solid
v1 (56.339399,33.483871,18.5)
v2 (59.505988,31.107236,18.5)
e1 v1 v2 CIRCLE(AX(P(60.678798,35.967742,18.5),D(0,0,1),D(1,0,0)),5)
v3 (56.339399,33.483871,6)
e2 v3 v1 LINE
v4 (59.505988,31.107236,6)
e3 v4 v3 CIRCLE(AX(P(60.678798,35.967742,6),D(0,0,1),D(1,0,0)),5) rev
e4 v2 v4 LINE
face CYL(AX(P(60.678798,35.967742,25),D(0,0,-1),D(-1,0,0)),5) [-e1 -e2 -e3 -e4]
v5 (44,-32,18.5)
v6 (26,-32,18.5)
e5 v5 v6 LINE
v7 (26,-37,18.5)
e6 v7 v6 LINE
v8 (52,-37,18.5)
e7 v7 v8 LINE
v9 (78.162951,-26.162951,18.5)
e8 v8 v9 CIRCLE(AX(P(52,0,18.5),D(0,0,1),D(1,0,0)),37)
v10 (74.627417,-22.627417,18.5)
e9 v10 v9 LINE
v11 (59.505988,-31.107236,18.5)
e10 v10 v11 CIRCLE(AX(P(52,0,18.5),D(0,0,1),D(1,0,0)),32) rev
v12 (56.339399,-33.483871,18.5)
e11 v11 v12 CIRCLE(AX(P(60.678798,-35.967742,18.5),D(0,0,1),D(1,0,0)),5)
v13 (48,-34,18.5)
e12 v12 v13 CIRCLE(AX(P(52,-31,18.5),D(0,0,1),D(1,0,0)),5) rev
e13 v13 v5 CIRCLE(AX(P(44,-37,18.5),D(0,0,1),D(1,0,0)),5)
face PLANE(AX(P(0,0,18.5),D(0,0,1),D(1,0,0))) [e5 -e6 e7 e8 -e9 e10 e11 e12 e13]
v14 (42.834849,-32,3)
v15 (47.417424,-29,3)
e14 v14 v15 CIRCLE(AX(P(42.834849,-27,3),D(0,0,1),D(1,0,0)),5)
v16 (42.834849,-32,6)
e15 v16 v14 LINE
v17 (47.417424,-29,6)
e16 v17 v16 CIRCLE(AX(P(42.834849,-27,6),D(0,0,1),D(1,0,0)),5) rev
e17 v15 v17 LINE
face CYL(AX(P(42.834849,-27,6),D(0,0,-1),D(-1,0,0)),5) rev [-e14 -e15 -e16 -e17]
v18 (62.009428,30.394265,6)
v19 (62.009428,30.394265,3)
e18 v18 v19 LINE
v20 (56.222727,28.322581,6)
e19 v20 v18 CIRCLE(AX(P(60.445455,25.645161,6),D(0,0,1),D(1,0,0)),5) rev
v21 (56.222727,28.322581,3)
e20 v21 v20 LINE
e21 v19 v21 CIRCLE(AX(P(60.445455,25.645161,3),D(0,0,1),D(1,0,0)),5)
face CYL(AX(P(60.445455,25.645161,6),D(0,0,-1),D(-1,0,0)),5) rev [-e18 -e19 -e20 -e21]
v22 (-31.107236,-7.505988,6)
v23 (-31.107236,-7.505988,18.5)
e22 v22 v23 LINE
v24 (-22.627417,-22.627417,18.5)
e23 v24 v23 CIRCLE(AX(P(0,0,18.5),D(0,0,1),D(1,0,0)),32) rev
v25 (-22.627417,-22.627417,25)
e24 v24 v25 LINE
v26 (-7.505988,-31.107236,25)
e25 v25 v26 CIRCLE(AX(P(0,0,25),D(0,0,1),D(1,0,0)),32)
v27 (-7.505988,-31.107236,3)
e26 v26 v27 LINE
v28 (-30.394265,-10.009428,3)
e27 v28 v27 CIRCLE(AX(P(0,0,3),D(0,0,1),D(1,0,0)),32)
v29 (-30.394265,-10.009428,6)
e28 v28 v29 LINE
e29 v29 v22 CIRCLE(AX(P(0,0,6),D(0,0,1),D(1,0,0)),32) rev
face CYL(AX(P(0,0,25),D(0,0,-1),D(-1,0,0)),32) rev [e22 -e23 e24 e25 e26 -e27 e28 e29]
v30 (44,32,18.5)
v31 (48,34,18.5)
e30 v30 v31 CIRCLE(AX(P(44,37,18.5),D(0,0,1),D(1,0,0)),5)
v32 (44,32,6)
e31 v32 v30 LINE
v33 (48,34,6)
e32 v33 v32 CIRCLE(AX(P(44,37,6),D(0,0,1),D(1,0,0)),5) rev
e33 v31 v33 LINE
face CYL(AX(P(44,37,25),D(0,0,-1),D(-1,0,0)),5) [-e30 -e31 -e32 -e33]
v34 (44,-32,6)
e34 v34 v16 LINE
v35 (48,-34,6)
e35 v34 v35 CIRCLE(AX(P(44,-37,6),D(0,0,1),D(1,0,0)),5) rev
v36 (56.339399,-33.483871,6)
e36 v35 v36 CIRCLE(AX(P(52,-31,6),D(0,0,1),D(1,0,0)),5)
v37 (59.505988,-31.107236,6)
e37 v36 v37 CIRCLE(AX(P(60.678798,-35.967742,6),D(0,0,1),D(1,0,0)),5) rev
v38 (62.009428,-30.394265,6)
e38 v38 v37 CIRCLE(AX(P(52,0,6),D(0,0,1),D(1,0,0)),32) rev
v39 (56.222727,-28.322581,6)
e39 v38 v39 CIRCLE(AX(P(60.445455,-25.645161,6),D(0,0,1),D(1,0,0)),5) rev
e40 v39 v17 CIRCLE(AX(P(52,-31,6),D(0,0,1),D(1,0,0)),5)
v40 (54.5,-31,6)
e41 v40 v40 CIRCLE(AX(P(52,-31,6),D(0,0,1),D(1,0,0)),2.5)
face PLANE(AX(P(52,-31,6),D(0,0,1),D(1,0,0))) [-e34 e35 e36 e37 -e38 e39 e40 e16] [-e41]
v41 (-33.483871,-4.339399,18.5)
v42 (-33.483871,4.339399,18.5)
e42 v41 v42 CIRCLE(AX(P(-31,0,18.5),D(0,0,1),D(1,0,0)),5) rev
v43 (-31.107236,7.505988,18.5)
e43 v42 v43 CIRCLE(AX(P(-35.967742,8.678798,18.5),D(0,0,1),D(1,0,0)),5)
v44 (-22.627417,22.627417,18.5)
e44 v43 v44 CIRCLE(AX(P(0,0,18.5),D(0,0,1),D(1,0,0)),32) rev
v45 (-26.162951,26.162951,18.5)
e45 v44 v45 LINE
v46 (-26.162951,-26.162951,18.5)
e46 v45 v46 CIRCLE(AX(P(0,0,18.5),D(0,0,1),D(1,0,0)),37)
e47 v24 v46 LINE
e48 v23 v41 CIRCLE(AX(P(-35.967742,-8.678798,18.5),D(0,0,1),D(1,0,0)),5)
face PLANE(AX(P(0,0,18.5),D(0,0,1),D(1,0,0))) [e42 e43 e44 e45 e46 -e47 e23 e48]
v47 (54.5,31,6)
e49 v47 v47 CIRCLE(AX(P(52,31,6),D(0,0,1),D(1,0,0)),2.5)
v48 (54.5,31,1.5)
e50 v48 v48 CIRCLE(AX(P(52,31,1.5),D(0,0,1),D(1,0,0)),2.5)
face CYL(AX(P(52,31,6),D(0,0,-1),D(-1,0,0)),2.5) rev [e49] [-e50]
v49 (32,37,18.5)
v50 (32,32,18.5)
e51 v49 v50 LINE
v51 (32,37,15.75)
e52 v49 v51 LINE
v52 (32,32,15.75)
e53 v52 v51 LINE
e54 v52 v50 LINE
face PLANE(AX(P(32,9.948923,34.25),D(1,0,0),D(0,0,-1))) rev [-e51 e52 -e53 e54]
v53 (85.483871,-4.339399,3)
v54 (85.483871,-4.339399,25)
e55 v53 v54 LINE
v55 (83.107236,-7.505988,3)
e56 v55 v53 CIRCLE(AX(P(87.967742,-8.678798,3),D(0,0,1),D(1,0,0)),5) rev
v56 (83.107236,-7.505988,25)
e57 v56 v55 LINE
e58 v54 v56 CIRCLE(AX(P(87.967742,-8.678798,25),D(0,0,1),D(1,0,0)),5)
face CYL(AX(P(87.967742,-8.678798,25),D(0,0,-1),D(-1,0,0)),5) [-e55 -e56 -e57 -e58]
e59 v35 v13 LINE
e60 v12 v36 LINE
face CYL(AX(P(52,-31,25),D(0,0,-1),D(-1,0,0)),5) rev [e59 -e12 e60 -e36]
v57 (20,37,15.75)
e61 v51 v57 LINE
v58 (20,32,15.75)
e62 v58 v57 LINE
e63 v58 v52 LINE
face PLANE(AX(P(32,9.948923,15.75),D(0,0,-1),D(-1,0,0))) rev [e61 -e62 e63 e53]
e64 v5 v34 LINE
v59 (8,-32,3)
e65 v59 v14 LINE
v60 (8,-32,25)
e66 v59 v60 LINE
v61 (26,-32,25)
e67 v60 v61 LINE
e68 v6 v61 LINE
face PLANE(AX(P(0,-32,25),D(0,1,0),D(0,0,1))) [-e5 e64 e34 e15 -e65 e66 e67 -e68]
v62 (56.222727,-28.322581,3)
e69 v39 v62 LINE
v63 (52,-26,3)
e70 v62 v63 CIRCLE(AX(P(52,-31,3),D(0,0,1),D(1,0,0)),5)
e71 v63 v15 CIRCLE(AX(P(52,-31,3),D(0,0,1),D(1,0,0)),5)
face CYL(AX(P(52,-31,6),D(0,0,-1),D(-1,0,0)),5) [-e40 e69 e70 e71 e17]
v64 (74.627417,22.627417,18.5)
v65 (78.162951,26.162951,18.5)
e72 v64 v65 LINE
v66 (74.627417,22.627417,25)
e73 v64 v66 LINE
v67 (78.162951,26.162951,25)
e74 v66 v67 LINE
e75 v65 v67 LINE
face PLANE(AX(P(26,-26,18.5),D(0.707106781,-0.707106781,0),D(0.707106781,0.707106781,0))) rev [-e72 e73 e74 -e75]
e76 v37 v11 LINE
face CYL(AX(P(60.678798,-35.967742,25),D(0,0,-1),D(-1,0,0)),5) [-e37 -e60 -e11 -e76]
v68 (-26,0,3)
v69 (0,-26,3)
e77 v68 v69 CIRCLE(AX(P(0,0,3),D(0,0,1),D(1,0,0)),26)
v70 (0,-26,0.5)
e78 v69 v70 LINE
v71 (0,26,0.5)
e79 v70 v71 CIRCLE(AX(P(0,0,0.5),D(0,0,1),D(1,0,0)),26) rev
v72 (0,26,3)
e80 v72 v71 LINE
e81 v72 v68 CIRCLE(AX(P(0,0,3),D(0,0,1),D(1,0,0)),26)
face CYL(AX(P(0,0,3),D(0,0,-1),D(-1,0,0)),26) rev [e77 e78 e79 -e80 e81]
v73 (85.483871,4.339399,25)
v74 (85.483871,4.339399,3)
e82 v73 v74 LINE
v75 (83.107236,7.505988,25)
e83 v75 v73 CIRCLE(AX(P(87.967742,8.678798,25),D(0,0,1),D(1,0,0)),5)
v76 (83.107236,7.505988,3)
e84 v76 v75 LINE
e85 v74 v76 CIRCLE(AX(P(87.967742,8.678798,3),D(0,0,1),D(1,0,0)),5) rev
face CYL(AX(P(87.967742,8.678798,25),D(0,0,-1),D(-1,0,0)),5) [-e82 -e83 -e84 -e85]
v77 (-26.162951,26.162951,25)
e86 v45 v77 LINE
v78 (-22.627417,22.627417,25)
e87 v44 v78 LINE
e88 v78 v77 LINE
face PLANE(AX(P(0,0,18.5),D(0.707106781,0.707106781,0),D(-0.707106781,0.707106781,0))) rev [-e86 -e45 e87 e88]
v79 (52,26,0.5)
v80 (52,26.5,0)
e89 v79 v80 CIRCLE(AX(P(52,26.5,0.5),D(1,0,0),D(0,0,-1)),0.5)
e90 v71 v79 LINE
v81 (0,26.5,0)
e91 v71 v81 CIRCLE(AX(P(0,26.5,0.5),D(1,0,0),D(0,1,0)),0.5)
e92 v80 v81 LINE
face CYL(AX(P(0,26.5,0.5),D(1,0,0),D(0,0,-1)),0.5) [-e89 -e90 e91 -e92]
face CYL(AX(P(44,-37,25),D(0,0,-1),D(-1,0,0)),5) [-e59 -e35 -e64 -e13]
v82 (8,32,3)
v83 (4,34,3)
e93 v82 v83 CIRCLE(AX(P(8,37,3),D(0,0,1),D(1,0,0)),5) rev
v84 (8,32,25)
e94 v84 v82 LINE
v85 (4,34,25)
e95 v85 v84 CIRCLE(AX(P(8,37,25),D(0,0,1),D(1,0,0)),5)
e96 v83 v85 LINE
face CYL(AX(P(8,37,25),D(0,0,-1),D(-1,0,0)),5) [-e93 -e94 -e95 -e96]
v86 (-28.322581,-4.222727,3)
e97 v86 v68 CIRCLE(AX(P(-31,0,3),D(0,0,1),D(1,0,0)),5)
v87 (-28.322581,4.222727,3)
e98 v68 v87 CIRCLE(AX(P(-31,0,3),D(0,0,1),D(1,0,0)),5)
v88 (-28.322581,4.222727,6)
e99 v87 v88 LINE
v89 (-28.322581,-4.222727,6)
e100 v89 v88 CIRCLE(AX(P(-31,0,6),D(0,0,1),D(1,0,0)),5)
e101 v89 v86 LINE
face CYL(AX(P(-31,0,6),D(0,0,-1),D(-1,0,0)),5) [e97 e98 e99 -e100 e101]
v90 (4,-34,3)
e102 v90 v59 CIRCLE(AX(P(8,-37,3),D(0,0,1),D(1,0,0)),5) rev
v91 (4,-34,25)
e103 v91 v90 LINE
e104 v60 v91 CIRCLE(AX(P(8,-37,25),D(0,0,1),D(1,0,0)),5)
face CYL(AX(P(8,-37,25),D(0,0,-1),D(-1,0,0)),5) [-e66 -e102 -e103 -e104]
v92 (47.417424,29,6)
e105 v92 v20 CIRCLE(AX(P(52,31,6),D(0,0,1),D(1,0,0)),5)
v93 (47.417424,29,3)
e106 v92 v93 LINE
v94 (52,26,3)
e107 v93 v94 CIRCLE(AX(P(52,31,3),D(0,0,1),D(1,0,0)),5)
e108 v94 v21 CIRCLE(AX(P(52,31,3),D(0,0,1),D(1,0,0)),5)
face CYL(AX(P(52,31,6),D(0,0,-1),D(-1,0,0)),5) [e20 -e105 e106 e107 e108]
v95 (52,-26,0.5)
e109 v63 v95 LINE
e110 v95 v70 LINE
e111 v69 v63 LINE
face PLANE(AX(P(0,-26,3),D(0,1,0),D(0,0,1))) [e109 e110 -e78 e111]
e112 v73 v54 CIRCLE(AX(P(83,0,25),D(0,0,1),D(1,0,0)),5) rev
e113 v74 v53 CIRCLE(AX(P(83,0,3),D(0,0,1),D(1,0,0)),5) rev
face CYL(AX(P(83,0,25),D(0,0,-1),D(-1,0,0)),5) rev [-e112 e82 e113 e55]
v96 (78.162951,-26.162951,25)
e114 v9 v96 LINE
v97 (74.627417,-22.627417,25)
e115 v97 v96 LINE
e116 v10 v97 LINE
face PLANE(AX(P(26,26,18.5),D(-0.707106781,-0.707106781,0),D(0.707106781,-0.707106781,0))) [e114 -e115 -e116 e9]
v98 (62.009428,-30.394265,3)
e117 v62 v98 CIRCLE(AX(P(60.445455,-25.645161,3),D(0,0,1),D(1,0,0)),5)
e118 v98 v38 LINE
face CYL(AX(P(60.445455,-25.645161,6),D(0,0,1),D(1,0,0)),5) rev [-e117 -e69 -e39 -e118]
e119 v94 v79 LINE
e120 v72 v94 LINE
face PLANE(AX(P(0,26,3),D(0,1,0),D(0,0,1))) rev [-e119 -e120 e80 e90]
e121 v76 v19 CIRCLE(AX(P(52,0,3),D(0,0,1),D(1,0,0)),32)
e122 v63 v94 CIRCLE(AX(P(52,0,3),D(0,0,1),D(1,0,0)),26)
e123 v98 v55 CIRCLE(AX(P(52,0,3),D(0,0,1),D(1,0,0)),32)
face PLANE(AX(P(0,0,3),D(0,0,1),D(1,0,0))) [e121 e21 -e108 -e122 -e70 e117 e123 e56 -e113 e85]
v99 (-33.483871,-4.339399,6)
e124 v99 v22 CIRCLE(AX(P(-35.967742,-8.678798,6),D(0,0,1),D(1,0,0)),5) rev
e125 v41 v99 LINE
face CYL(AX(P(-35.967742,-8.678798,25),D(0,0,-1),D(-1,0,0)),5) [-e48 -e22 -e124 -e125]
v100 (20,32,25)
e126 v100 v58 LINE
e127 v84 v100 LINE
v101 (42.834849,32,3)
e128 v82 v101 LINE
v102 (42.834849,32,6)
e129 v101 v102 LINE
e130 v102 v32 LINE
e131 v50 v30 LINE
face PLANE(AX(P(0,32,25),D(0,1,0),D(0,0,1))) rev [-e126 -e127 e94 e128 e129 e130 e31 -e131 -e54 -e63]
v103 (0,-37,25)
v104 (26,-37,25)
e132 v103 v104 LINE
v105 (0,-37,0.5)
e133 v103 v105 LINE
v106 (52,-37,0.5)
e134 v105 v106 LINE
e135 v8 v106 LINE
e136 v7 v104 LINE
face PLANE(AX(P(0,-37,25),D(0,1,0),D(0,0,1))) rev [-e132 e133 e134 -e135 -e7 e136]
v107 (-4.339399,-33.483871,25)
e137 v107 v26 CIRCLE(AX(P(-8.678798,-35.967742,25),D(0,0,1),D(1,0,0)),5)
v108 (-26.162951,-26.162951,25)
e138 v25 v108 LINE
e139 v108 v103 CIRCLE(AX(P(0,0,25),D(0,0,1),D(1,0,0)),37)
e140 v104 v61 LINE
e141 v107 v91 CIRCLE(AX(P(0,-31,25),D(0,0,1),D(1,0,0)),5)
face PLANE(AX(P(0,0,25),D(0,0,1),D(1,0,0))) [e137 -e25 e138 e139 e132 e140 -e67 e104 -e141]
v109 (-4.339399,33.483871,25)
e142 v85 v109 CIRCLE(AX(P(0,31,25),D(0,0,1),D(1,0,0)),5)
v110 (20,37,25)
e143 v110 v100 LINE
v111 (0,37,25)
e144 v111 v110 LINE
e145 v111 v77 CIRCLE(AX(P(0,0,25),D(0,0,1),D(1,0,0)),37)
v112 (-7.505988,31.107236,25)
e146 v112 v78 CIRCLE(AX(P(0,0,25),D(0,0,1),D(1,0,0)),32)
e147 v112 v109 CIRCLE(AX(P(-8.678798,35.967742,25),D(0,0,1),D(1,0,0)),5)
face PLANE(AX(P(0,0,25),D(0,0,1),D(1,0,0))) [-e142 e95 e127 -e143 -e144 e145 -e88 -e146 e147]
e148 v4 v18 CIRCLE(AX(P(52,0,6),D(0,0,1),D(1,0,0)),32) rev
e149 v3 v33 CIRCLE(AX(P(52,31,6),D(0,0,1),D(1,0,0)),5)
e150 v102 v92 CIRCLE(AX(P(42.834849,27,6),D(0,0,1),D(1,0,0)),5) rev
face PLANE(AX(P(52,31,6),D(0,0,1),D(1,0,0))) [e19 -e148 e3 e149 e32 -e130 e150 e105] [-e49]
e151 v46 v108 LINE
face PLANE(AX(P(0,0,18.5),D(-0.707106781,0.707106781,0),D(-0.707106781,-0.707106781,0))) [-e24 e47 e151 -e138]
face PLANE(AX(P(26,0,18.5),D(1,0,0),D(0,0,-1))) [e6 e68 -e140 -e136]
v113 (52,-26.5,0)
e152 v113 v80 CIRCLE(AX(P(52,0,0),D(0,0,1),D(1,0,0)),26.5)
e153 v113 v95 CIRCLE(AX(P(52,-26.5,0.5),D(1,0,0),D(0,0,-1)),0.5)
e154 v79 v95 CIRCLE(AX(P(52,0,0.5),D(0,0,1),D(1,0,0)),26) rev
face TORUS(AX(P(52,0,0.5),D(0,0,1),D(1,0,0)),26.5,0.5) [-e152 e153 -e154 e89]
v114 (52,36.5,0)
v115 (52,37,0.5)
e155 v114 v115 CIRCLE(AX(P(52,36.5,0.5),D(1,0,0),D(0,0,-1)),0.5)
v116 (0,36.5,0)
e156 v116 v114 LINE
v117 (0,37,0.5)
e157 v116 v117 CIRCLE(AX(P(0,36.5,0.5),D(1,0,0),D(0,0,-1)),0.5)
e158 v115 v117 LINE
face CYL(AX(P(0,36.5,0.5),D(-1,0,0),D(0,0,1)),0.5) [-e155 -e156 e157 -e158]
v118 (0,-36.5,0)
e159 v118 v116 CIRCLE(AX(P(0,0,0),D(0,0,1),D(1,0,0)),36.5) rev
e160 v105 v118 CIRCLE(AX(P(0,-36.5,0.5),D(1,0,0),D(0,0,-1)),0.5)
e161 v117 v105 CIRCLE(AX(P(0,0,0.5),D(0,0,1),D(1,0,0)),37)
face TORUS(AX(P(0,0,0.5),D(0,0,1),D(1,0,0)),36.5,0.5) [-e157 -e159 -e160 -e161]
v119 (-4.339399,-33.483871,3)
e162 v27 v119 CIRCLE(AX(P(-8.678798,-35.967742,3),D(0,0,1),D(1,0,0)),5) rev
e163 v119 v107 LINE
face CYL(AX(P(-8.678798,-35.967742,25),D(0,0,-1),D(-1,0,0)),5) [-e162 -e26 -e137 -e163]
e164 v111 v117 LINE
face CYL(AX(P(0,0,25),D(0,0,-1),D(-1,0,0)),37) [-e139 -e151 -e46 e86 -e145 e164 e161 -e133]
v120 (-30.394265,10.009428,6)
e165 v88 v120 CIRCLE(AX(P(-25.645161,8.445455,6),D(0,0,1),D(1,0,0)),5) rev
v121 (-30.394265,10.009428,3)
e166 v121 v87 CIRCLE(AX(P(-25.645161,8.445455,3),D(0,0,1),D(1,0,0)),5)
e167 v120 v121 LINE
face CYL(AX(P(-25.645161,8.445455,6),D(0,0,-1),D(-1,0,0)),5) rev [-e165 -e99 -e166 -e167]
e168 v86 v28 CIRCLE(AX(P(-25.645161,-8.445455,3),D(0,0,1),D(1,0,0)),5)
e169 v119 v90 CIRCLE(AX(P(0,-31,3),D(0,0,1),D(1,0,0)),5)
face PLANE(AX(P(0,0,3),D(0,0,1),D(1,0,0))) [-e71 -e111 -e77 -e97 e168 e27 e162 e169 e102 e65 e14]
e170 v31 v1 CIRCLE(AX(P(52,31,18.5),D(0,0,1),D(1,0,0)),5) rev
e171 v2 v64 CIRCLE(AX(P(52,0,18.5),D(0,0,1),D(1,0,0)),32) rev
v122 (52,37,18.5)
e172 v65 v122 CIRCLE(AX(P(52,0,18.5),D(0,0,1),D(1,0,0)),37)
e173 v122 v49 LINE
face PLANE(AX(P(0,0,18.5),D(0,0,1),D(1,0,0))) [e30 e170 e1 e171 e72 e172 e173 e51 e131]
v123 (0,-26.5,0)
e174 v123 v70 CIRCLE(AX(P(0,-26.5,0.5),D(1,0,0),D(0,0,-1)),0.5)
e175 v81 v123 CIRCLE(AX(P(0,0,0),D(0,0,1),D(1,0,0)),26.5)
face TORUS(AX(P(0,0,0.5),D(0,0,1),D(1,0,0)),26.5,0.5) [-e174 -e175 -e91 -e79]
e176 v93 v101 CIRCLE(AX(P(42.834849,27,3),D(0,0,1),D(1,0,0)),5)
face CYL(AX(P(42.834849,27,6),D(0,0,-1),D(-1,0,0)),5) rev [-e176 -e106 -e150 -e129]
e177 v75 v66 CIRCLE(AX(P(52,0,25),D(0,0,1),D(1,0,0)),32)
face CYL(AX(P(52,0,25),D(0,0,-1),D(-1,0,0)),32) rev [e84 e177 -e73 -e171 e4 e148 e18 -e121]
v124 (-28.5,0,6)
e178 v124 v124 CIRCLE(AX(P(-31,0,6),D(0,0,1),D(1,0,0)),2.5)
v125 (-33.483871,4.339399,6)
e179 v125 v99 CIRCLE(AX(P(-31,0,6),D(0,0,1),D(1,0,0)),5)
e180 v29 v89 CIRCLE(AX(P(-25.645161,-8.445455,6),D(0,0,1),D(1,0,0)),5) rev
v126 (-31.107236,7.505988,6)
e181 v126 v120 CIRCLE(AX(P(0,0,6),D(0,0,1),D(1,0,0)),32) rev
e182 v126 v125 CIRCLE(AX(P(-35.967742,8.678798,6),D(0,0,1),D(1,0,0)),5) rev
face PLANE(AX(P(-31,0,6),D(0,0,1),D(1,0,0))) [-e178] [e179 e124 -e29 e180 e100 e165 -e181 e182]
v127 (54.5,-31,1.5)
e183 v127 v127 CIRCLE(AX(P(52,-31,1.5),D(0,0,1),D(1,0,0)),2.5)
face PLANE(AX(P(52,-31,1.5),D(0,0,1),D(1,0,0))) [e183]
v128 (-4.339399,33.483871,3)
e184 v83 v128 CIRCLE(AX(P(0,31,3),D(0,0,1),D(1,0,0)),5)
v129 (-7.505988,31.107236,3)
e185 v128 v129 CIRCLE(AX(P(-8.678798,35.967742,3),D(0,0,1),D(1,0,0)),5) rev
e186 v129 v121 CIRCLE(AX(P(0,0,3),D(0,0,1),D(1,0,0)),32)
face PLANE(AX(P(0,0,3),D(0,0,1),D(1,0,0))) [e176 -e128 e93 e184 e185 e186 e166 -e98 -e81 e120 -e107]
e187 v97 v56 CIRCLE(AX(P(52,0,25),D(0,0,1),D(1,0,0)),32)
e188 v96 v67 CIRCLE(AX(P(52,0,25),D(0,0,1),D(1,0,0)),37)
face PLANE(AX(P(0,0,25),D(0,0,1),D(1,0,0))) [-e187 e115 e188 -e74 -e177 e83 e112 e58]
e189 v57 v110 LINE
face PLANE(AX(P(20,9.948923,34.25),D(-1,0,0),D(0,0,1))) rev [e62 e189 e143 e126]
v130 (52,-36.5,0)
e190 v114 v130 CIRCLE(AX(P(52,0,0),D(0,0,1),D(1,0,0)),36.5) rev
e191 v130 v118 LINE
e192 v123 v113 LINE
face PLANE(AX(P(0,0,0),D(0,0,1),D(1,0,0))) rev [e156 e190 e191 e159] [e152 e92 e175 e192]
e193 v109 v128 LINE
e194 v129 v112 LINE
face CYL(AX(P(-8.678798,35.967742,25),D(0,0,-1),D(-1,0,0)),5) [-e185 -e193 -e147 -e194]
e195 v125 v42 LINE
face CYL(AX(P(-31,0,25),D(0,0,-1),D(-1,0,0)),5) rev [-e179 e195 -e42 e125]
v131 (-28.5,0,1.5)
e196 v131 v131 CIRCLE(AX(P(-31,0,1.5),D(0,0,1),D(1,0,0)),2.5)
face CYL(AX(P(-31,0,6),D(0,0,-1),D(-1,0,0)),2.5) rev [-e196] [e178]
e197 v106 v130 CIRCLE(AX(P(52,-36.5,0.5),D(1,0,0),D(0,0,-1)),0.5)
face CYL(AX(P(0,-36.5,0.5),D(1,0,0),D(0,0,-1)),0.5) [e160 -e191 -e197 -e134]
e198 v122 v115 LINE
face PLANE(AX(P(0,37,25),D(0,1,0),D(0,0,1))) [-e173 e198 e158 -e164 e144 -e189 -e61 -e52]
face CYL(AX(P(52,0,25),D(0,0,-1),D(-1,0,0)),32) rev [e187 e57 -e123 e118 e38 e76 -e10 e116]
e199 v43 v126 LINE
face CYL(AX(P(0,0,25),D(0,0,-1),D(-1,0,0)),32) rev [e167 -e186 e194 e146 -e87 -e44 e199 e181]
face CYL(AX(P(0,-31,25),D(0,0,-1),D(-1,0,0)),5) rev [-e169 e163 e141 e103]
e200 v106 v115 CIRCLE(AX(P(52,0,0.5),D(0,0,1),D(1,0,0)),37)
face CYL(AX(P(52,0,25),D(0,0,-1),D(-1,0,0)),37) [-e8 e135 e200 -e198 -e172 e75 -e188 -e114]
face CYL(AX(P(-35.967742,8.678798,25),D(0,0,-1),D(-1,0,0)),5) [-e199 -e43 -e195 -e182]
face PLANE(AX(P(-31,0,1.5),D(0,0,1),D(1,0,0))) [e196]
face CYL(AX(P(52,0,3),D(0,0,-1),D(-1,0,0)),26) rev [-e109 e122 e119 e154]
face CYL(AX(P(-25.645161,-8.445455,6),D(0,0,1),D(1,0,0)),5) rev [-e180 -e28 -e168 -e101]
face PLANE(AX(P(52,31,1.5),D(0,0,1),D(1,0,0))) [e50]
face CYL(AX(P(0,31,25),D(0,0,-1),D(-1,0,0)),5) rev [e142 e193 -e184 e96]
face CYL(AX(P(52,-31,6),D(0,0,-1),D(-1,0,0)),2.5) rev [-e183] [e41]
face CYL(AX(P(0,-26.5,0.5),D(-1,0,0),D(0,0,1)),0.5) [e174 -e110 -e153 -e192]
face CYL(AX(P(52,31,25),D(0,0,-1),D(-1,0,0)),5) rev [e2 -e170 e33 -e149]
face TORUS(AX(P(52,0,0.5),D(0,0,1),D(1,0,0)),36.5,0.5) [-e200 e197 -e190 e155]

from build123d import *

# Parameters (mm, degrees)
BOSS_EXTRUDE1_DEPTH = 25
SKETCH1_3_R         = 5
BOSS_EXTRUDE2_DEPTH = 3
SKETCH2_W           = 12
SKETCH2_H           = 18.5
CUT_EXTRUDE1_DEPTH  = 5
BOSS_EXTRUDE3_START = 3
SKETCH1_4_R         = 5
SKETCH1_4_R_2       = 2.5
BOSS_EXTRUDE3_DEPTH = 3
FILLET2_R           = 5
FILLET3_R           = 5
FILLET1_R           = 0.5
CUT_EXTRUDE3_START  = 1.5
SKETCH1_6_R         = 2.5
CUT_EXTRUDE3_DEPTH  = 1.5
CUT_EXTRUDE4_START  = -6.5
CUT_EXTRUDE4_DEPTH  = 6.5


with BuildPart() as part:
    # Sketch1 → Boss-Extrude1 (new body)
    with BuildSketch(Plane.XY):
        with BuildLine():
            Line((52, 37), (0, 37))
            ThreePointArc((0, 37), (-37, 0), (0, -37))
            Line((0, -37), (52, -37))
            ThreePointArc((52, -37), (89, 0), (52, 37))
        make_face()
        with BuildLine():
            ThreePointArc((-31.612903226, 4.96229278), (-22.627416998, 22.627416998), (-4.96229278, 31.612903226))
            ThreePointArc((-4.96229278, 31.612903226), (-0.196120171, 35.996152207), (4.898979486, 32))
            Line((4.898979486, 32), (47.101020514, 32))
            ThreePointArc((47.101020514, 32), (52.196120171, 35.996152207), (56.96229278, 31.612903226))
            ThreePointArc((56.96229278, 31.612903226), (74.627416998, 22.627416998), (83.612903226, 4.96229278))
            ThreePointArc((83.612903226, 4.96229278), (86.745965572, 3.311758134), (88, 0))
            ThreePointArc((88, 0), (86.745965572, -3.311758134), (83.612903226, -4.96229278))
            ThreePointArc((83.612903226, -4.96229278), (74.627416998, -22.627416998), (56.96229278, -31.612903226))
            ThreePointArc((56.96229278, -31.612903226), (52.196120171, -35.996152207), (47.101020514, -32))
            Line((47.101020514, -32), (4.898979486, -32))
            ThreePointArc((4.898979486, -32), (-0.196120171, -35.996152207), (-4.96229278, -31.612903226))
            ThreePointArc((-4.96229278, -31.612903226), (-22.627416998, -22.627416998), (-31.612903226, -4.96229278))
            ThreePointArc((-31.612903226, -4.96229278), (-36, 0), (-31.612903226, 4.96229278))
        make_face(mode=Mode.SUBTRACT)
    extrude(amount=BOSS_EXTRUDE1_DEPTH)

    # Sketch1<3> → Boss-Extrude2 (add)
    # profile 1 of 43: a face of its own
    with BuildSketch(Plane.XY):
        with BuildLine():
            Line((0, -37), (52, -37))
            ThreePointArc((52, -37), (89, 0), (52, 37))
            Line((52, 37), (0, 37))
            ThreePointArc((0, 37), (-37, 0), (0, -37))
        make_face()
        with Locations((0, 31)):
            Circle(SKETCH1_3_R, mode=Mode.SUBTRACT)
        with Locations((52, 31)):
            Circle(SKETCH1_3_R, mode=Mode.SUBTRACT)
        with Locations((83, 0)):
            Circle(SKETCH1_3_R, mode=Mode.SUBTRACT)
        with Locations((52, -31)):
            Circle(SKETCH1_3_R, mode=Mode.SUBTRACT)
        with Locations((0, -31)):
            Circle(SKETCH1_3_R, mode=Mode.SUBTRACT)
        with Locations((-31, 0)):
            Circle(SKETCH1_3_R, mode=Mode.SUBTRACT)
        with BuildLine():
            Line((0, 32), (52, 32))
            ThreePointArc((52, 32), (84, 0), (52, -32))
            Line((52, -32), (0, -32))
            ThreePointArc((0, -32), (-32, 0), (0, 32))
        make_face(mode=Mode.SUBTRACT)
    # profile 2 of 43: a face of its own
    with BuildSketch(Plane.XY):
        with BuildLine():
            Line((52, 32), (49.708712153, 32))
            ThreePointArc((49.708712153, 32), (51.489225891, 28.552734218), (54.5, 31))
            ThreePointArc((54.5, 31), (54.456219207, 31.465818858), (54.326410233, 31.915322581))
            ThreePointArc((54.326410233, 31.915322581), (53.16397539, 31.978823638), (52, 32))
        make_face()
    # profile 3 of 43: a face of its own
    with BuildSketch(Plane.XY):
        with BuildLine():
            ThreePointArc((54.326410233, 31.915322581), (52.04583625, 33.499579772), (49.708712153, 32))
            Line((49.708712153, 32), (52, 32))
            ThreePointArc((52, 32), (53.16397539, 31.978823638), (54.326410233, 31.915322581))
        make_face()
    # profile 4 of 43: a face of its own
    with BuildSketch(Plane.XY):
        with BuildLine():
            ThreePointArc((56.96229278, 31.612903226), (52.196120171, 35.996152207), (47.101020514, 32))
            Line((47.101020514, 32), (49.708712153, 32))
            ThreePointArc((49.708712153, 32), (52.04583625, 33.499579772), (54.326410233, 31.915322581))
            ThreePointArc((54.326410233, 31.915322581), (55.647487117, 31.791442838), (56.96229278, 31.612903226))
        make_face()
    # profile 5 of 43: a face of its own
    with BuildSketch(Plane.XY):
        with BuildLine():
            ThreePointArc((47.101020514, 32), (48.127016654, 27.83772234), (52, 26))
            ThreePointArc((52, 26), (55.535533906, 27.464466094), (57, 31))
            ThreePointArc((57, 31), (56.990564292, 31.307031024), (56.96229278, 31.612903226))
            ThreePointArc((56.96229278, 31.612903226), (55.647487117, 31.791442838), (54.326410233, 31.915322581))
            ThreePointArc((54.326410233, 31.915322581), (54.456219207, 31.465818858), (54.5, 31))
            ThreePointArc((54.5, 31), (51.489225891, 28.552734218), (49.708712153, 32))
            Line((49.708712153, 32), (47.101020514, 32))
        make_face()
    # profile 6 of 43: a face of its own
    with BuildSketch(Plane.XY):
        with BuildLine():
            Line((52, 32), (49.708712153, 32))
            ThreePointArc((49.708712153, 32), (51.489225891, 28.552734218), (54.5, 31))
            ThreePointArc((54.5, 31), (54.456219207, 31.465818858), (54.326410233, 31.915322581))
            ThreePointArc((54.326410233, 31.915322581), (53.16397539, 31.978823638), (52, 32))
        make_face()
    # profile 7 of 43: a face of its own
    with BuildSketch(Plane.XY):
        with BuildLine():
            ThreePointArc((54.326410233, 31.915322581), (52.04583625, 33.499579772), (49.708712153, 32))
            Line((49.708712153, 32), (52, 32))
            ThreePointArc((52, 32), (53.16397539, 31.978823638), (54.326410233, 31.915322581))
        make_face()
    # profile 8 of 43: a face of its own
    with BuildSketch(Plane.XY):
        with BuildLine():
            ThreePointArc((56.96229278, 31.612903226), (52.196120171, 35.996152207), (47.101020514, 32))
            Line((47.101020514, 32), (49.708712153, 32))
            ThreePointArc((49.708712153, 32), (52.04583625, 33.499579772), (54.326410233, 31.915322581))
            ThreePointArc((54.326410233, 31.915322581), (55.647487117, 31.791442838), (56.96229278, 31.612903226))
        make_face()
    # profile 9 of 43: a face of its own
    with BuildSketch(Plane.XY):
        with BuildLine():
            ThreePointArc((47.101020514, 32), (48.127016654, 27.83772234), (52, 26))
            ThreePointArc((52, 26), (55.535533906, 27.464466094), (57, 31))
            ThreePointArc((57, 31), (56.990564292, 31.307031024), (56.96229278, 31.612903226))
            ThreePointArc((56.96229278, 31.612903226), (55.647487117, 31.791442838), (54.326410233, 31.915322581))
            ThreePointArc((54.326410233, 31.915322581), (54.456219207, 31.465818858), (54.5, 31))
            ThreePointArc((54.5, 31), (51.489225891, 28.552734218), (49.708712153, 32))
            Line((49.708712153, 32), (47.101020514, 32))
        make_face()
    # profile 10 of 43: a face of its own
    with BuildSketch(Plane.XY):
        with BuildLine():
            ThreePointArc((57, 31), (55.535533906, 27.464466094), (52, 26))
            ThreePointArc((52, 26), (70.384776311, 18.384776311), (78, 0))
            ThreePointArc((78, 0), (79.688241866, 3.745965572), (83.612903226, 4.96229278))
            ThreePointArc((83.612903226, 4.96229278), (74.627416998, 22.627416998), (56.96229278, 31.612903226))
            ThreePointArc((56.96229278, 31.612903226), (56.990564292, 31.307031024), (57, 31))
        make_face()
    # profile 11 of 43: a face of its own
    with BuildSketch(Plane.XY):
        with BuildLine():
            ThreePointArc((88, 0), (86.745965572, 3.311758134), (83.612903226, 4.96229278))
            ThreePointArc((83.612903226, 4.96229278), (84, 0), (83.612903226, -4.96229278))
            ThreePointArc((83.612903226, -4.96229278), (86.745965572, -3.311758134), (88, 0))
        make_face()
    # profile 12 of 43: a face of its own
    with BuildSketch(Plane.XY):
        with BuildLine():
            ThreePointArc((83.612903226, 4.96229278), (79.688241866, 3.745965572), (78, 0))
            ThreePointArc((78, 0), (79.688241866, -3.745965572), (83.612903226, -4.96229278))
            ThreePointArc((83.612903226, -4.96229278), (84, 0), (83.612903226, 4.96229278))
        make_face()
    # profile 13 of 43: a face of its own
    with BuildSketch(Plane.XY):
        with BuildLine():
            ThreePointArc((83.612903226, -4.96229278), (79.688241866, -3.745965572), (78, 0))
            ThreePointArc((78, 0), (70.384776311, -18.384776311), (52, -26))
            ThreePointArc((52, -26), (55.535533906, -27.464466094), (57, -31))
            ThreePointArc((57, -31), (56.990564292, -31.307031024), (56.96229278, -31.612903226))
            ThreePointArc((56.96229278, -31.612903226), (74.627416998, -22.627416998), (83.612903226, -4.96229278))
        make_face()
    # profile 14 of 43: a face of its own
    with BuildSketch(Plane.XY):
        with BuildLine():
            Line((49.708712153, -32), (47.101020514, -32))
            ThreePointArc((47.101020514, -32), (52.196120171, -35.996152207), (56.96229278, -31.612903226))
            ThreePointArc((56.96229278, -31.612903226), (55.647487117, -31.791442838), (54.326410233, -31.915322581))
            ThreePointArc((54.326410233, -31.915322581), (52.04583625, -33.499579772), (49.708712153, -32))
        make_face()
    # profile 15 of 43: a face of its own
    with BuildSketch(Plane.XY):
        with BuildLine():
            ThreePointArc((57, -31), (55.535533906, -27.464466094), (52, -26))
            ThreePointArc((52, -26), (48.127016654, -27.83772234), (47.101020514, -32))
            Line((47.101020514, -32), (49.708712153, -32))
            ThreePointArc((49.708712153, -32), (51.489225891, -28.552734218), (54.5, -31))
            ThreePointArc((54.5, -31), (54.456219207, -31.465818858), (54.326410233, -31.915322581))
            ThreePointArc((54.326410233, -31.915322581), (55.647487117, -31.791442838), (56.96229278, -31.612903226))
            ThreePointArc((56.96229278, -31.612903226), (56.990564292, -31.307031024), (57, -31))
        make_face()
    # profile 16 of 43: a face of its own
    with BuildSketch(Plane.XY):
        with BuildLine():
            Line((52, -32), (49.708712153, -32))
            ThreePointArc((49.708712153, -32), (52.04583625, -33.499579772), (54.326410233, -31.915322581))
            ThreePointArc((54.326410233, -31.915322581), (53.16397539, -31.978823638), (52, -32))
        make_face()
    # profile 17 of 43: a face of its own
    with BuildSketch(Plane.XY):
        with BuildLine():
            ThreePointArc((54.5, -31), (51.489225891, -28.552734218), (49.708712153, -32))
            Line((49.708712153, -32), (52, -32))
            ThreePointArc((52, -32), (53.16397539, -31.978823638), (54.326410233, -31.915322581))
            ThreePointArc((54.326410233, -31.915322581), (54.456219207, -31.465818858), (54.5, -31))
        make_face()
    # profile 18 of 43: a face of its own
    with BuildSketch(Plane.XY):
        with BuildLine():
            Line((52, -26), (0, -26))
            ThreePointArc((0, -26), (3.535533906, -27.464466094), (5, -31))
            ThreePointArc((5, -31), (4.974680765, -31.50254481), (4.898979486, -32))
            Line((4.898979486, -32), (47.101020514, -32))
            ThreePointArc((47.101020514, -32), (48.127016654, -27.83772234), (52, -26))
        make_face()
    # profile 19 of 43: a face of its own
    with BuildSketch(Plane.XY):
        with BuildLine():
            ThreePointArc((0, -32), (-2.488684067, -31.90307903), (-4.96229278, -31.612903226))
            ThreePointArc((-4.96229278, -31.612903226), (-0.196120171, -35.996152207), (4.898979486, -32))
            Line((4.898979486, -32), (0, -32))
        make_face()
    # profile 20 of 43: a face of its own
    with BuildSketch(Plane.XY):
        with BuildLine():
            ThreePointArc((5, -31), (3.535533906, -27.464466094), (0, -26))
            ThreePointArc((0, -26), (-3.745965572, -27.688241866), (-4.96229278, -31.612903226))
            ThreePointArc((-4.96229278, -31.612903226), (-2.488684067, -31.90307903), (0, -32))
            Line((0, -32), (4.898979486, -32))
            ThreePointArc((4.898979486, -32), (4.974680765, -31.50254481), (5, -31))
        make_face()
    # profile 21 of 43: a face of its own
    with BuildSketch(Plane.XY):
        with BuildLine():
            ThreePointArc((0, -26), (-18.384776311, -18.384776311), (-26, 0))
            ThreePointArc((-26, 0), (-27.688241866, -3.745965572), (-31.612903226, -4.96229278))
            ThreePointArc((-31.612903226, -4.96229278), (-22.627416998, -22.627416998), (-4.96229278, -31.612903226))
            ThreePointArc((-4.96229278, -31.612903226), (-3.745965572, -27.688241866), (0, -26))
        make_face()
    # profile 22 of 43: a face of its own
    with BuildSketch(Plane.XY):
        with BuildLine():
            ThreePointArc((-31.915322581, -2.326410233), (-32, 0), (-31.915322581, 2.326410233))
            ThreePointArc((-31.915322581, 2.326410233), (-33.5, 0), (-31.915322581, -2.326410233))
        make_face()
    # profile 23 of 43: a face of its own
    with BuildSketch(Plane.XY):
        with BuildLine():
            ThreePointArc((-28.5, 0), (-29.592574416, 2.06619293), (-31.915322581, 2.326410233))
            ThreePointArc((-31.915322581, 2.326410233), (-32, 0), (-31.915322581, -2.326410233))
            ThreePointArc((-31.915322581, -2.326410233), (-29.592574416, -2.06619293), (-28.5, 0))
        make_face()
    # profile 24 of 43: a face of its own
    with BuildSketch(Plane.XY):
        with BuildLine():
            ThreePointArc((-31.915322581, 2.326410233), (-31.791442838, 3.647487117), (-31.612903226, 4.96229278))
            ThreePointArc((-31.612903226, 4.96229278), (-36, 0), (-31.612903226, -4.96229278))
            ThreePointArc((-31.612903226, -4.96229278), (-31.791442838, -3.647487117), (-31.915322581, -2.326410233))
            ThreePointArc((-31.915322581, -2.326410233), (-33.5, 0), (-31.915322581, 2.326410233))
        make_face()
    # profile 25 of 43: a face of its own
    with BuildSketch(Plane.XY):
        with BuildLine():
            ThreePointArc((-31.612903226, -4.96229278), (-27.688241866, -3.745965572), (-26, 0))
            ThreePointArc((-26, 0), (-27.688241866, 3.745965572), (-31.612903226, 4.96229278))
            ThreePointArc((-31.612903226, 4.96229278), (-31.791442838, 3.647487117), (-31.915322581, 2.326410233))
            ThreePointArc((-31.915322581, 2.326410233), (-29.592574416, 2.06619293), (-28.5, 0))
            ThreePointArc((-28.5, 0), (-29.592574416, -2.06619293), (-31.915322581, -2.326410233))
            ThreePointArc((-31.915322581, -2.326410233), (-31.791442838, -3.647487117), (-31.612903226, -4.96229278))
        make_face()
    # profile 26 of 43: a face of its own
    with BuildSketch(Plane.XY):
        with BuildLine():
            ThreePointArc((-26, 0), (-18.384776311, 18.384776311), (0, 26))
            ThreePointArc((0, 26), (-3.745965572, 27.688241866), (-4.96229278, 31.612903226))
            ThreePointArc((-4.96229278, 31.612903226), (-22.627416998, 22.627416998), (-31.612903226, 4.96229278))
            ThreePointArc((-31.612903226, 4.96229278), (-27.688241866, 3.745965572), (-26, 0))
        make_face()
    # profile 27 of 43: a face of its own
    with BuildSketch(Plane.XY):
        with BuildLine():
            ThreePointArc((4.898979486, 32), (-0.196120171, 35.996152207), (-4.96229278, 31.612903226))
            ThreePointArc((-4.96229278, 31.612903226), (-2.488684067, 31.90307903), (0, 32))
            Line((0, 32), (4.898979486, 32))
        make_face()
    # profile 28 of 43: a face of its own
    with BuildSketch(Plane.XY):
        with BuildLine():
            ThreePointArc((-4.96229278, 31.612903226), (-3.745965572, 27.688241866), (0, 26))
            ThreePointArc((0, 26), (3.535533906, 27.464466094), (5, 31))
            ThreePointArc((5, 31), (4.974680765, 31.50254481), (4.898979486, 32))
            Line((4.898979486, 32), (0, 32))
            ThreePointArc((0, 32), (-2.488684067, 31.90307903), (-4.96229278, 31.612903226))
        make_face()
    # profile 29 of 43: a face of its own
    with BuildSketch(Plane.XY):
        with BuildLine():
            ThreePointArc((5, 31), (3.535533906, 27.464466094), (0, 26))
            Line((0, 26), (52, 26))
            ThreePointArc((52, 26), (48.127016654, 27.83772234), (47.101020514, 32))
            Line((47.101020514, 32), (4.898979486, 32))
            ThreePointArc((4.898979486, 32), (4.974680765, 31.50254481), (5, 31))
        make_face()
    # profile 30 of 43: a face of its own
    with BuildSketch(Plane.XY):
        with BuildLine():
            ThreePointArc((-4.96229278, 31.612903226), (-3.745965572, 27.688241866), (0, 26))
            ThreePointArc((0, 26), (3.535533906, 27.464466094), (5, 31))
            ThreePointArc((5, 31), (4.974680765, 31.50254481), (4.898979486, 32))
            Line((4.898979486, 32), (0, 32))
            ThreePointArc((0, 32), (-2.488684067, 31.90307903), (-4.96229278, 31.612903226))
        make_face()
    # profile 31 of 43: a face of its own
    with BuildSketch(Plane.XY):
        with BuildLine():
            ThreePointArc((4.898979486, 32), (-0.196120171, 35.996152207), (-4.96229278, 31.612903226))
            ThreePointArc((-4.96229278, 31.612903226), (-2.488684067, 31.90307903), (0, 32))
            Line((0, 32), (4.898979486, 32))
        make_face()
    # profile 32 of 43: a face of its own
    with BuildSketch(Plane.XY):
        with BuildLine():
            ThreePointArc((-31.612903226, -4.96229278), (-27.688241866, -3.745965572), (-26, 0))
            ThreePointArc((-26, 0), (-27.688241866, 3.745965572), (-31.612903226, 4.96229278))
            ThreePointArc((-31.612903226, 4.96229278), (-31.791442838, 3.647487117), (-31.915322581, 2.326410233))
            ThreePointArc((-31.915322581, 2.326410233), (-29.592574416, 2.06619293), (-28.5, 0))
            ThreePointArc((-28.5, 0), (-29.592574416, -2.06619293), (-31.915322581, -2.326410233))
            ThreePointArc((-31.915322581, -2.326410233), (-31.791442838, -3.647487117), (-31.612903226, -4.96229278))
        make_face()
    # profile 33 of 43: a face of its own
    with BuildSketch(Plane.XY):
        with BuildLine():
            ThreePointArc((-31.915322581, 2.326410233), (-31.791442838, 3.647487117), (-31.612903226, 4.96229278))
            ThreePointArc((-31.612903226, 4.96229278), (-36, 0), (-31.612903226, -4.96229278))
            ThreePointArc((-31.612903226, -4.96229278), (-31.791442838, -3.647487117), (-31.915322581, -2.326410233))
            ThreePointArc((-31.915322581, -2.326410233), (-33.5, 0), (-31.915322581, 2.326410233))
        make_face()
    # profile 34 of 43: a face of its own
    with BuildSketch(Plane.XY):
        with BuildLine():
            ThreePointArc((-28.5, 0), (-29.592574416, 2.06619293), (-31.915322581, 2.326410233))
            ThreePointArc((-31.915322581, 2.326410233), (-32, 0), (-31.915322581, -2.326410233))
            ThreePointArc((-31.915322581, -2.326410233), (-29.592574416, -2.06619293), (-28.5, 0))
        make_face()
    # profile 35 of 43: a face of its own
    with BuildSketch(Plane.XY):
        with BuildLine():
            ThreePointArc((-31.915322581, -2.326410233), (-32, 0), (-31.915322581, 2.326410233))
            ThreePointArc((-31.915322581, 2.326410233), (-33.5, 0), (-31.915322581, -2.326410233))
        make_face()
    # profile 36 of 43: a face of its own
    with BuildSketch(Plane.XY):
        with BuildLine():
            ThreePointArc((57, -31), (55.535533906, -27.464466094), (52, -26))
            ThreePointArc((52, -26), (48.127016654, -27.83772234), (47.101020514, -32))
            Line((47.101020514, -32), (49.708712153, -32))
            ThreePointArc((49.708712153, -32), (51.489225891, -28.552734218), (54.5, -31))
            ThreePointArc((54.5, -31), (54.456219207, -31.465818858), (54.326410233, -31.915322581))
            ThreePointArc((54.326410233, -31.915322581), (55.647487117, -31.791442838), (56.96229278, -31.612903226))
            ThreePointArc((56.96229278, -31.612903226), (56.990564292, -31.307031024), (57, -31))
        make_face()
    # profile 37 of 43: a face of its own
    with BuildSketch(Plane.XY):
        with BuildLine():
            Line((49.708712153, -32), (47.101020514, -32))
            ThreePointArc((47.101020514, -32), (52.196120171, -35.996152207), (56.96229278, -31.612903226))
            ThreePointArc((56.96229278, -31.612903226), (55.647487117, -31.791442838), (54.326410233, -31.915322581))
            ThreePointArc((54.326410233, -31.915322581), (52.04583625, -33.499579772), (49.708712153, -32))
        make_face()
    # profile 38 of 43: a face of its own
    with BuildSketch(Plane.XY):
        with BuildLine():
            ThreePointArc((54.5, -31), (51.489225891, -28.552734218), (49.708712153, -32))
            Line((49.708712153, -32), (52, -32))
            ThreePointArc((52, -32), (53.16397539, -31.978823638), (54.326410233, -31.915322581))
            ThreePointArc((54.326410233, -31.915322581), (54.456219207, -31.465818858), (54.5, -31))
        make_face()
    # profile 39 of 43: a face of its own
    with BuildSketch(Plane.XY):
        with BuildLine():
            Line((52, -32), (49.708712153, -32))
            ThreePointArc((49.708712153, -32), (52.04583625, -33.499579772), (54.326410233, -31.915322581))
            ThreePointArc((54.326410233, -31.915322581), (53.16397539, -31.978823638), (52, -32))
        make_face()
    # profile 40 of 43: a face of its own
    with BuildSketch(Plane.XY):
        with BuildLine():
            ThreePointArc((83.612903226, 4.96229278), (79.688241866, 3.745965572), (78, 0))
            ThreePointArc((78, 0), (79.688241866, -3.745965572), (83.612903226, -4.96229278))
            ThreePointArc((83.612903226, -4.96229278), (84, 0), (83.612903226, 4.96229278))
        make_face()
    # profile 41 of 43: a face of its own
    with BuildSketch(Plane.XY):
        with BuildLine():
            ThreePointArc((88, 0), (86.745965572, 3.311758134), (83.612903226, 4.96229278))
            ThreePointArc((83.612903226, 4.96229278), (84, 0), (83.612903226, -4.96229278))
            ThreePointArc((83.612903226, -4.96229278), (86.745965572, -3.311758134), (88, 0))
        make_face()
    # profile 42 of 43: a face of its own
    with BuildSketch(Plane.XY):
        with BuildLine():
            ThreePointArc((5, -31), (3.535533906, -27.464466094), (0, -26))
            ThreePointArc((0, -26), (-3.745965572, -27.688241866), (-4.96229278, -31.612903226))
            ThreePointArc((-4.96229278, -31.612903226), (-2.488684067, -31.90307903), (0, -32))
            Line((0, -32), (4.898979486, -32))
            ThreePointArc((4.898979486, -32), (4.974680765, -31.50254481), (5, -31))
        make_face()
    # profile 43 of 43: a face of its own
    with BuildSketch(Plane.XY):
        with BuildLine():
            ThreePointArc((0, -32), (-2.488684067, -31.90307903), (-4.96229278, -31.612903226))
            ThreePointArc((-4.96229278, -31.612903226), (-0.196120171, -35.996152207), (4.898979486, -32))
            Line((4.898979486, -32), (0, -32))
        make_face()
    extrude(amount=BOSS_EXTRUDE2_DEPTH)

    # Sketch2 → Cut-Extrude1 (cut)
    with BuildSketch(Plane(origin=(0, 37, 0), x_dir=(1, 0, 0), z_dir=(0, 1, 0))):
        with Locations((26, -25)):
            Rectangle(SKETCH2_W, SKETCH2_H)
    extrude(amount=-CUT_EXTRUDE1_DEPTH, mode=Mode.SUBTRACT)

    # Sketch1<4> → Boss-Extrude3 (add)
    # profile 1 of 3: a face of its own
    with BuildSketch(Plane.XY.offset(BOSS_EXTRUDE3_START)):
        with Locations((-31, 0)):
            Circle(SKETCH1_4_R)
        with Locations((-31, 0)):
            Circle(SKETCH1_4_R_2, mode=Mode.SUBTRACT)
    # profile 2 of 3: a face of its own
    with BuildSketch(Plane.XY.offset(BOSS_EXTRUDE3_START)):
        with Locations((52, -31)):
            Circle(SKETCH1_4_R)
        with Locations((52, -31)):
            Circle(SKETCH1_4_R_2, mode=Mode.SUBTRACT)
    # profile 3 of 3: a face of its own
    with BuildSketch(Plane.XY.offset(BOSS_EXTRUDE3_START)):
        with Locations((52, 31)):
            Circle(SKETCH1_4_R)
        with Locations((52, 31)):
            Circle(SKETCH1_4_R_2, mode=Mode.SUBTRACT)
    extrude(amount=BOSS_EXTRUDE3_DEPTH)

    # Fillet2
    # the kernel refuses this fillet: 5 mm, written as the material it adds along each edge
    with BuildSketch(Plane(origin=(-31.612903226, -4.96229278, -9.980429616), x_dir=(0.2347067910888954, -0.9720662128768562, 0), z_dir=(0, 0, 1))) as fillet2_piece_1_section:
        with BuildLine():
            CenterArc((4.786533421, 4.983518583), FILLET2_R, 198.802392553, 75.850995491)
            ThreePointArc((0.05335441, 3.371992458), (0.319549613, 1.681362163), (0, 0))
            ThreePointArc((0, 0), (2.596085923, -0.105481068), (5.192171846, 0))
        make_face()
    fillet2_piece_1 = extrude(amount=15.980429616, mode=Mode.PRIVATE)
    fillet2_piece_1 = split(fillet2_piece_1, bisect_by=Plane(origin=(-30.606812106, -6.144779527, 0), z_dir=(0, 0, 1)), keep=Keep.TOP, mode=Mode.PRIVATE)
    add(fillet2_piece_1)
    with BuildSketch(Plane(origin=(-31.612903226, 4.96229278, -9.980429616), x_dir=(0.23470679108889603, 0.9720662128768561, 0), z_dir=(0, 0, 1))) as fillet2_piece_2_section:
        with BuildLine():
            CenterArc((4.786533421, -4.983518583), FILLET2_R, 85.346611956, 75.850995491)
            ThreePointArc((0.05335441, -3.371992458), (0.319549613, -1.681362163), (0, 0))
            ThreePointArc((0, 0), (2.596085923, 0.105481068), (5.192171846, 0))
        make_face()
    fillet2_piece_2 = extrude(amount=15.980429616, mode=Mode.PRIVATE)
    fillet2_piece_2 = split(fillet2_piece_2, bisect_by=Plane(origin=(-30.606812106, 6.144779527, 0), z_dir=(0, 0, 1)), keep=Keep.TOP, mode=Mode.PRIVATE)
    add(fillet2_piece_2)
    with BuildSketch(Plane(origin=(47.101020514, 32, -7.665429761), x_dir=(-1, 0, 0), z_dir=(0, 0, 1))) as fillet2_piece_3_section:
        with BuildLine():
            CenterArc((4.266171904, 5), FILLET2_R, 203.578178478, 66.421821522)
            ThreePointArc((-0.316403791, 3), (0.073441671, 1.524430968), (0, 0))
            Line((0, 0), (4.266171904, 0))
        make_face()
    fillet2_piece_3 = extrude(amount=13.665429761, mode=Mode.PRIVATE)
    fillet2_piece_3 = split(fillet2_piece_3, bisect_by=Plane(origin=(46.060941631, 31.318489549, 0), z_dir=(0, 0, 1)), keep=Keep.TOP, mode=Mode.PRIVATE)
    add(fillet2_piece_3)
    with BuildSketch(Plane(origin=(56.96229278, 31.612903226, -9.980429616), x_dir=(0.972066212876856, -0.23470679108889672, 0), z_dir=(0, 0, 1))) as fillet2_piece_4_section:
        with BuildLine():
            CenterArc((4.786533421, -4.983518583), FILLET2_R, 85.346611956, 75.850995491)
            ThreePointArc((0.05335441, -3.371992458), (0.319549613, -1.681362163), (0, 0))
            ThreePointArc((0, 0), (2.596085923, 0.105481068), (5.192171846, 0))
        make_face()
    fillet2_piece_4 = extrude(amount=15.980429616, mode=Mode.PRIVATE)
    fillet2_piece_4 = split(fillet2_piece_4, bisect_by=Plane(origin=(58.144779527, 30.606812106, 0), z_dir=(0, 0, 1)), keep=Keep.TOP, mode=Mode.PRIVATE)
    add(fillet2_piece_4)
    with BuildSketch(Plane(origin=(56.96229278, -31.612903226, -9.980429616), x_dir=(0.9720662128768561, 0.23470679108889575, 0), z_dir=(0, 0, 1))) as fillet2_piece_5_section:
        with BuildLine():
            CenterArc((4.786533421, 4.983518583), FILLET2_R, 198.802392553, 75.850995491)
            ThreePointArc((0.05335441, 3.371992458), (0.319549613, 1.681362163), (0, 0))
            ThreePointArc((0, 0), (2.596085923, -0.105481068), (5.192171846, 0))
        make_face()
    fillet2_piece_5 = extrude(amount=15.980429616, mode=Mode.PRIVATE)
    fillet2_piece_5 = split(fillet2_piece_5, bisect_by=Plane(origin=(58.144779527, -30.606812106, 0), z_dir=(0, 0, 1)), keep=Keep.TOP, mode=Mode.PRIVATE)
    add(fillet2_piece_5)
    with BuildSketch(Plane(origin=(47.101020514, -32, -7.665429761), x_dir=(-1, 0, 0), z_dir=(0, 0, 1))) as fillet2_piece_6_section:
        with BuildLine():
            CenterArc((4.266171904, -5), FILLET2_R, 90, 66.421821522)
            ThreePointArc((-0.316403791, -3), (0.073441671, -1.524430968), (0, 0))
            Line((0, 0), (4.266171904, 0))
        make_face()
    fillet2_piece_6 = extrude(amount=13.665429761, mode=Mode.PRIVATE)
    fillet2_piece_6 = split(fillet2_piece_6, bisect_by=Plane(origin=(46.060941631, -31.318489549, 0), z_dir=(0, 0, 1)), keep=Keep.TOP, mode=Mode.PRIVATE)
    add(fillet2_piece_6)

    # Fillet3
    fillet3_edges = [part.edges().sort_by_distance(p)[0] for p in [
        (-4.96229278, 31.612903226, 14),
        (-31.612903226, 4.96229278, 15.5),
        (-31.612903226, -4.96229278, 15.5),
        (-4.96229278, -31.612903226, 14),
        (4.898979486, -32, 14),
        (47.101020514, -32, 15.5),
        (56.96229278, -31.612903226, 15.5),
        (83.612903226, -4.96229278, 14),
        (83.612903226, 4.96229278, 14),
        (56.96229278, 31.612903226, 15.5),
        (47.101020514, 32, 15.5),
        (4.898979486, 32, 14),
    ]]
    fillet(fillet3_edges, radius=FILLET3_R)

    # Fillet1
    fillet1_edges = [part.edges().sort_by_distance(p)[0] for p in [
        (-37, 0, 0),
        (26, 37, 0),
        (89, 0, 0),
        (26, -37, 0),
        (-26, 0, 0),
        (26, -26, 0),
        (78, 0, 0),
        (26, 26, 0),
    ]]
    fillet(fillet1_edges, radius=FILLET1_R)

    # Sketch1<6> → Cut-Extrude3 (cut)
    with BuildSketch(Plane.XY.offset(CUT_EXTRUDE3_START)):
        with Locations((-31, 0)):
            Circle(SKETCH1_6_R)
        with Locations((52, -31)):
            Circle(SKETCH1_6_R)
        with Locations((52, 31)):
            Circle(SKETCH1_6_R)
    extrude(amount=CUT_EXTRUDE3_DEPTH, mode=Mode.SUBTRACT)

    # Sketch3 → Cut-Extrude4 (cut)
    with BuildSketch(Plane.XY.offset(25).offset(CUT_EXTRUDE4_START)):
        with BuildLine():
            ThreePointArc((-31.107236269, 7.505987725), (-27.910887593, 15.651912144), (-22.627416998, 22.627416998))
            Line((-22.627416998, 22.627416998), (-26.162950904, 26.162950904))
            ThreePointArc((-26.162950904, 26.162950904), (-37, 0), (-26.162950904, -26.162950904))
            Line((-26.162950904, -26.162950904), (-22.627416998, -22.627416998))
            ThreePointArc((-22.627416998, -22.627416998), (-27.910887593, -15.651912144), (-31.107236269, -7.505987725))
            ThreePointArc((-31.107236269, -7.505987725), (-31.968768588, -5.677429925), (-33.483870968, -4.339399154))
            ThreePointArc((-33.483870968, -4.339399154), (-36, 0), (-33.483870968, 4.339399154))
            ThreePointArc((-33.483870968, 4.339399154), (-31.968768588, 5.677429925), (-31.107236269, 7.505987725))
        make_face()
        with BuildLine():
            ThreePointArc((59.505987725, 31.107236269), (67.651912144, 27.910887593), (74.627416998, 22.627416998))
            Line((74.627416998, 22.627416998), (78.162950904, 26.162950904))
            ThreePointArc((78.162950904, 26.162950904), (66.159286998, 34.183542703), (52, 37))
            Line((52, 37), (32, 37))
            Line((32, 37), (32, 32))
            Line((32, 32), (44, 32))
            ThreePointArc((44, 32), (46.236067977, 32.527864045), (48, 34))
            ThreePointArc((48, 34), (52.3088612, 35.990451358), (56.339399154, 33.483870968))
            ThreePointArc((56.339399154, 33.483870968), (57.677429925, 31.968768588), (59.505987725, 31.107236269))
        make_face()
        with BuildLine():
            Line((44, -32), (26, -32))
            Line((26, -32), (26, -37))
            Line((26, -37), (52, -37))
            ThreePointArc((52, -37), (66.159286998, -34.183542703), (78.162950904, -26.162950904))
            Line((78.162950904, -26.162950904), (74.627416998, -22.627416998))
            ThreePointArc((74.627416998, -22.627416998), (67.651912144, -27.910887593), (59.505987725, -31.107236269))
            ThreePointArc((59.505987725, -31.107236269), (57.677429925, -31.968768588), (56.339399154, -33.483870968))
            ThreePointArc((56.339399154, -33.483870968), (52.3088612, -35.990451358), (48, -34))
            ThreePointArc((48, -34), (46.236067977, -32.527864045), (44, -32))
        make_face()
    extrude(amount=CUT_EXTRUDE4_DEPTH, mode=Mode.SUBTRACT)


solid = part.part
